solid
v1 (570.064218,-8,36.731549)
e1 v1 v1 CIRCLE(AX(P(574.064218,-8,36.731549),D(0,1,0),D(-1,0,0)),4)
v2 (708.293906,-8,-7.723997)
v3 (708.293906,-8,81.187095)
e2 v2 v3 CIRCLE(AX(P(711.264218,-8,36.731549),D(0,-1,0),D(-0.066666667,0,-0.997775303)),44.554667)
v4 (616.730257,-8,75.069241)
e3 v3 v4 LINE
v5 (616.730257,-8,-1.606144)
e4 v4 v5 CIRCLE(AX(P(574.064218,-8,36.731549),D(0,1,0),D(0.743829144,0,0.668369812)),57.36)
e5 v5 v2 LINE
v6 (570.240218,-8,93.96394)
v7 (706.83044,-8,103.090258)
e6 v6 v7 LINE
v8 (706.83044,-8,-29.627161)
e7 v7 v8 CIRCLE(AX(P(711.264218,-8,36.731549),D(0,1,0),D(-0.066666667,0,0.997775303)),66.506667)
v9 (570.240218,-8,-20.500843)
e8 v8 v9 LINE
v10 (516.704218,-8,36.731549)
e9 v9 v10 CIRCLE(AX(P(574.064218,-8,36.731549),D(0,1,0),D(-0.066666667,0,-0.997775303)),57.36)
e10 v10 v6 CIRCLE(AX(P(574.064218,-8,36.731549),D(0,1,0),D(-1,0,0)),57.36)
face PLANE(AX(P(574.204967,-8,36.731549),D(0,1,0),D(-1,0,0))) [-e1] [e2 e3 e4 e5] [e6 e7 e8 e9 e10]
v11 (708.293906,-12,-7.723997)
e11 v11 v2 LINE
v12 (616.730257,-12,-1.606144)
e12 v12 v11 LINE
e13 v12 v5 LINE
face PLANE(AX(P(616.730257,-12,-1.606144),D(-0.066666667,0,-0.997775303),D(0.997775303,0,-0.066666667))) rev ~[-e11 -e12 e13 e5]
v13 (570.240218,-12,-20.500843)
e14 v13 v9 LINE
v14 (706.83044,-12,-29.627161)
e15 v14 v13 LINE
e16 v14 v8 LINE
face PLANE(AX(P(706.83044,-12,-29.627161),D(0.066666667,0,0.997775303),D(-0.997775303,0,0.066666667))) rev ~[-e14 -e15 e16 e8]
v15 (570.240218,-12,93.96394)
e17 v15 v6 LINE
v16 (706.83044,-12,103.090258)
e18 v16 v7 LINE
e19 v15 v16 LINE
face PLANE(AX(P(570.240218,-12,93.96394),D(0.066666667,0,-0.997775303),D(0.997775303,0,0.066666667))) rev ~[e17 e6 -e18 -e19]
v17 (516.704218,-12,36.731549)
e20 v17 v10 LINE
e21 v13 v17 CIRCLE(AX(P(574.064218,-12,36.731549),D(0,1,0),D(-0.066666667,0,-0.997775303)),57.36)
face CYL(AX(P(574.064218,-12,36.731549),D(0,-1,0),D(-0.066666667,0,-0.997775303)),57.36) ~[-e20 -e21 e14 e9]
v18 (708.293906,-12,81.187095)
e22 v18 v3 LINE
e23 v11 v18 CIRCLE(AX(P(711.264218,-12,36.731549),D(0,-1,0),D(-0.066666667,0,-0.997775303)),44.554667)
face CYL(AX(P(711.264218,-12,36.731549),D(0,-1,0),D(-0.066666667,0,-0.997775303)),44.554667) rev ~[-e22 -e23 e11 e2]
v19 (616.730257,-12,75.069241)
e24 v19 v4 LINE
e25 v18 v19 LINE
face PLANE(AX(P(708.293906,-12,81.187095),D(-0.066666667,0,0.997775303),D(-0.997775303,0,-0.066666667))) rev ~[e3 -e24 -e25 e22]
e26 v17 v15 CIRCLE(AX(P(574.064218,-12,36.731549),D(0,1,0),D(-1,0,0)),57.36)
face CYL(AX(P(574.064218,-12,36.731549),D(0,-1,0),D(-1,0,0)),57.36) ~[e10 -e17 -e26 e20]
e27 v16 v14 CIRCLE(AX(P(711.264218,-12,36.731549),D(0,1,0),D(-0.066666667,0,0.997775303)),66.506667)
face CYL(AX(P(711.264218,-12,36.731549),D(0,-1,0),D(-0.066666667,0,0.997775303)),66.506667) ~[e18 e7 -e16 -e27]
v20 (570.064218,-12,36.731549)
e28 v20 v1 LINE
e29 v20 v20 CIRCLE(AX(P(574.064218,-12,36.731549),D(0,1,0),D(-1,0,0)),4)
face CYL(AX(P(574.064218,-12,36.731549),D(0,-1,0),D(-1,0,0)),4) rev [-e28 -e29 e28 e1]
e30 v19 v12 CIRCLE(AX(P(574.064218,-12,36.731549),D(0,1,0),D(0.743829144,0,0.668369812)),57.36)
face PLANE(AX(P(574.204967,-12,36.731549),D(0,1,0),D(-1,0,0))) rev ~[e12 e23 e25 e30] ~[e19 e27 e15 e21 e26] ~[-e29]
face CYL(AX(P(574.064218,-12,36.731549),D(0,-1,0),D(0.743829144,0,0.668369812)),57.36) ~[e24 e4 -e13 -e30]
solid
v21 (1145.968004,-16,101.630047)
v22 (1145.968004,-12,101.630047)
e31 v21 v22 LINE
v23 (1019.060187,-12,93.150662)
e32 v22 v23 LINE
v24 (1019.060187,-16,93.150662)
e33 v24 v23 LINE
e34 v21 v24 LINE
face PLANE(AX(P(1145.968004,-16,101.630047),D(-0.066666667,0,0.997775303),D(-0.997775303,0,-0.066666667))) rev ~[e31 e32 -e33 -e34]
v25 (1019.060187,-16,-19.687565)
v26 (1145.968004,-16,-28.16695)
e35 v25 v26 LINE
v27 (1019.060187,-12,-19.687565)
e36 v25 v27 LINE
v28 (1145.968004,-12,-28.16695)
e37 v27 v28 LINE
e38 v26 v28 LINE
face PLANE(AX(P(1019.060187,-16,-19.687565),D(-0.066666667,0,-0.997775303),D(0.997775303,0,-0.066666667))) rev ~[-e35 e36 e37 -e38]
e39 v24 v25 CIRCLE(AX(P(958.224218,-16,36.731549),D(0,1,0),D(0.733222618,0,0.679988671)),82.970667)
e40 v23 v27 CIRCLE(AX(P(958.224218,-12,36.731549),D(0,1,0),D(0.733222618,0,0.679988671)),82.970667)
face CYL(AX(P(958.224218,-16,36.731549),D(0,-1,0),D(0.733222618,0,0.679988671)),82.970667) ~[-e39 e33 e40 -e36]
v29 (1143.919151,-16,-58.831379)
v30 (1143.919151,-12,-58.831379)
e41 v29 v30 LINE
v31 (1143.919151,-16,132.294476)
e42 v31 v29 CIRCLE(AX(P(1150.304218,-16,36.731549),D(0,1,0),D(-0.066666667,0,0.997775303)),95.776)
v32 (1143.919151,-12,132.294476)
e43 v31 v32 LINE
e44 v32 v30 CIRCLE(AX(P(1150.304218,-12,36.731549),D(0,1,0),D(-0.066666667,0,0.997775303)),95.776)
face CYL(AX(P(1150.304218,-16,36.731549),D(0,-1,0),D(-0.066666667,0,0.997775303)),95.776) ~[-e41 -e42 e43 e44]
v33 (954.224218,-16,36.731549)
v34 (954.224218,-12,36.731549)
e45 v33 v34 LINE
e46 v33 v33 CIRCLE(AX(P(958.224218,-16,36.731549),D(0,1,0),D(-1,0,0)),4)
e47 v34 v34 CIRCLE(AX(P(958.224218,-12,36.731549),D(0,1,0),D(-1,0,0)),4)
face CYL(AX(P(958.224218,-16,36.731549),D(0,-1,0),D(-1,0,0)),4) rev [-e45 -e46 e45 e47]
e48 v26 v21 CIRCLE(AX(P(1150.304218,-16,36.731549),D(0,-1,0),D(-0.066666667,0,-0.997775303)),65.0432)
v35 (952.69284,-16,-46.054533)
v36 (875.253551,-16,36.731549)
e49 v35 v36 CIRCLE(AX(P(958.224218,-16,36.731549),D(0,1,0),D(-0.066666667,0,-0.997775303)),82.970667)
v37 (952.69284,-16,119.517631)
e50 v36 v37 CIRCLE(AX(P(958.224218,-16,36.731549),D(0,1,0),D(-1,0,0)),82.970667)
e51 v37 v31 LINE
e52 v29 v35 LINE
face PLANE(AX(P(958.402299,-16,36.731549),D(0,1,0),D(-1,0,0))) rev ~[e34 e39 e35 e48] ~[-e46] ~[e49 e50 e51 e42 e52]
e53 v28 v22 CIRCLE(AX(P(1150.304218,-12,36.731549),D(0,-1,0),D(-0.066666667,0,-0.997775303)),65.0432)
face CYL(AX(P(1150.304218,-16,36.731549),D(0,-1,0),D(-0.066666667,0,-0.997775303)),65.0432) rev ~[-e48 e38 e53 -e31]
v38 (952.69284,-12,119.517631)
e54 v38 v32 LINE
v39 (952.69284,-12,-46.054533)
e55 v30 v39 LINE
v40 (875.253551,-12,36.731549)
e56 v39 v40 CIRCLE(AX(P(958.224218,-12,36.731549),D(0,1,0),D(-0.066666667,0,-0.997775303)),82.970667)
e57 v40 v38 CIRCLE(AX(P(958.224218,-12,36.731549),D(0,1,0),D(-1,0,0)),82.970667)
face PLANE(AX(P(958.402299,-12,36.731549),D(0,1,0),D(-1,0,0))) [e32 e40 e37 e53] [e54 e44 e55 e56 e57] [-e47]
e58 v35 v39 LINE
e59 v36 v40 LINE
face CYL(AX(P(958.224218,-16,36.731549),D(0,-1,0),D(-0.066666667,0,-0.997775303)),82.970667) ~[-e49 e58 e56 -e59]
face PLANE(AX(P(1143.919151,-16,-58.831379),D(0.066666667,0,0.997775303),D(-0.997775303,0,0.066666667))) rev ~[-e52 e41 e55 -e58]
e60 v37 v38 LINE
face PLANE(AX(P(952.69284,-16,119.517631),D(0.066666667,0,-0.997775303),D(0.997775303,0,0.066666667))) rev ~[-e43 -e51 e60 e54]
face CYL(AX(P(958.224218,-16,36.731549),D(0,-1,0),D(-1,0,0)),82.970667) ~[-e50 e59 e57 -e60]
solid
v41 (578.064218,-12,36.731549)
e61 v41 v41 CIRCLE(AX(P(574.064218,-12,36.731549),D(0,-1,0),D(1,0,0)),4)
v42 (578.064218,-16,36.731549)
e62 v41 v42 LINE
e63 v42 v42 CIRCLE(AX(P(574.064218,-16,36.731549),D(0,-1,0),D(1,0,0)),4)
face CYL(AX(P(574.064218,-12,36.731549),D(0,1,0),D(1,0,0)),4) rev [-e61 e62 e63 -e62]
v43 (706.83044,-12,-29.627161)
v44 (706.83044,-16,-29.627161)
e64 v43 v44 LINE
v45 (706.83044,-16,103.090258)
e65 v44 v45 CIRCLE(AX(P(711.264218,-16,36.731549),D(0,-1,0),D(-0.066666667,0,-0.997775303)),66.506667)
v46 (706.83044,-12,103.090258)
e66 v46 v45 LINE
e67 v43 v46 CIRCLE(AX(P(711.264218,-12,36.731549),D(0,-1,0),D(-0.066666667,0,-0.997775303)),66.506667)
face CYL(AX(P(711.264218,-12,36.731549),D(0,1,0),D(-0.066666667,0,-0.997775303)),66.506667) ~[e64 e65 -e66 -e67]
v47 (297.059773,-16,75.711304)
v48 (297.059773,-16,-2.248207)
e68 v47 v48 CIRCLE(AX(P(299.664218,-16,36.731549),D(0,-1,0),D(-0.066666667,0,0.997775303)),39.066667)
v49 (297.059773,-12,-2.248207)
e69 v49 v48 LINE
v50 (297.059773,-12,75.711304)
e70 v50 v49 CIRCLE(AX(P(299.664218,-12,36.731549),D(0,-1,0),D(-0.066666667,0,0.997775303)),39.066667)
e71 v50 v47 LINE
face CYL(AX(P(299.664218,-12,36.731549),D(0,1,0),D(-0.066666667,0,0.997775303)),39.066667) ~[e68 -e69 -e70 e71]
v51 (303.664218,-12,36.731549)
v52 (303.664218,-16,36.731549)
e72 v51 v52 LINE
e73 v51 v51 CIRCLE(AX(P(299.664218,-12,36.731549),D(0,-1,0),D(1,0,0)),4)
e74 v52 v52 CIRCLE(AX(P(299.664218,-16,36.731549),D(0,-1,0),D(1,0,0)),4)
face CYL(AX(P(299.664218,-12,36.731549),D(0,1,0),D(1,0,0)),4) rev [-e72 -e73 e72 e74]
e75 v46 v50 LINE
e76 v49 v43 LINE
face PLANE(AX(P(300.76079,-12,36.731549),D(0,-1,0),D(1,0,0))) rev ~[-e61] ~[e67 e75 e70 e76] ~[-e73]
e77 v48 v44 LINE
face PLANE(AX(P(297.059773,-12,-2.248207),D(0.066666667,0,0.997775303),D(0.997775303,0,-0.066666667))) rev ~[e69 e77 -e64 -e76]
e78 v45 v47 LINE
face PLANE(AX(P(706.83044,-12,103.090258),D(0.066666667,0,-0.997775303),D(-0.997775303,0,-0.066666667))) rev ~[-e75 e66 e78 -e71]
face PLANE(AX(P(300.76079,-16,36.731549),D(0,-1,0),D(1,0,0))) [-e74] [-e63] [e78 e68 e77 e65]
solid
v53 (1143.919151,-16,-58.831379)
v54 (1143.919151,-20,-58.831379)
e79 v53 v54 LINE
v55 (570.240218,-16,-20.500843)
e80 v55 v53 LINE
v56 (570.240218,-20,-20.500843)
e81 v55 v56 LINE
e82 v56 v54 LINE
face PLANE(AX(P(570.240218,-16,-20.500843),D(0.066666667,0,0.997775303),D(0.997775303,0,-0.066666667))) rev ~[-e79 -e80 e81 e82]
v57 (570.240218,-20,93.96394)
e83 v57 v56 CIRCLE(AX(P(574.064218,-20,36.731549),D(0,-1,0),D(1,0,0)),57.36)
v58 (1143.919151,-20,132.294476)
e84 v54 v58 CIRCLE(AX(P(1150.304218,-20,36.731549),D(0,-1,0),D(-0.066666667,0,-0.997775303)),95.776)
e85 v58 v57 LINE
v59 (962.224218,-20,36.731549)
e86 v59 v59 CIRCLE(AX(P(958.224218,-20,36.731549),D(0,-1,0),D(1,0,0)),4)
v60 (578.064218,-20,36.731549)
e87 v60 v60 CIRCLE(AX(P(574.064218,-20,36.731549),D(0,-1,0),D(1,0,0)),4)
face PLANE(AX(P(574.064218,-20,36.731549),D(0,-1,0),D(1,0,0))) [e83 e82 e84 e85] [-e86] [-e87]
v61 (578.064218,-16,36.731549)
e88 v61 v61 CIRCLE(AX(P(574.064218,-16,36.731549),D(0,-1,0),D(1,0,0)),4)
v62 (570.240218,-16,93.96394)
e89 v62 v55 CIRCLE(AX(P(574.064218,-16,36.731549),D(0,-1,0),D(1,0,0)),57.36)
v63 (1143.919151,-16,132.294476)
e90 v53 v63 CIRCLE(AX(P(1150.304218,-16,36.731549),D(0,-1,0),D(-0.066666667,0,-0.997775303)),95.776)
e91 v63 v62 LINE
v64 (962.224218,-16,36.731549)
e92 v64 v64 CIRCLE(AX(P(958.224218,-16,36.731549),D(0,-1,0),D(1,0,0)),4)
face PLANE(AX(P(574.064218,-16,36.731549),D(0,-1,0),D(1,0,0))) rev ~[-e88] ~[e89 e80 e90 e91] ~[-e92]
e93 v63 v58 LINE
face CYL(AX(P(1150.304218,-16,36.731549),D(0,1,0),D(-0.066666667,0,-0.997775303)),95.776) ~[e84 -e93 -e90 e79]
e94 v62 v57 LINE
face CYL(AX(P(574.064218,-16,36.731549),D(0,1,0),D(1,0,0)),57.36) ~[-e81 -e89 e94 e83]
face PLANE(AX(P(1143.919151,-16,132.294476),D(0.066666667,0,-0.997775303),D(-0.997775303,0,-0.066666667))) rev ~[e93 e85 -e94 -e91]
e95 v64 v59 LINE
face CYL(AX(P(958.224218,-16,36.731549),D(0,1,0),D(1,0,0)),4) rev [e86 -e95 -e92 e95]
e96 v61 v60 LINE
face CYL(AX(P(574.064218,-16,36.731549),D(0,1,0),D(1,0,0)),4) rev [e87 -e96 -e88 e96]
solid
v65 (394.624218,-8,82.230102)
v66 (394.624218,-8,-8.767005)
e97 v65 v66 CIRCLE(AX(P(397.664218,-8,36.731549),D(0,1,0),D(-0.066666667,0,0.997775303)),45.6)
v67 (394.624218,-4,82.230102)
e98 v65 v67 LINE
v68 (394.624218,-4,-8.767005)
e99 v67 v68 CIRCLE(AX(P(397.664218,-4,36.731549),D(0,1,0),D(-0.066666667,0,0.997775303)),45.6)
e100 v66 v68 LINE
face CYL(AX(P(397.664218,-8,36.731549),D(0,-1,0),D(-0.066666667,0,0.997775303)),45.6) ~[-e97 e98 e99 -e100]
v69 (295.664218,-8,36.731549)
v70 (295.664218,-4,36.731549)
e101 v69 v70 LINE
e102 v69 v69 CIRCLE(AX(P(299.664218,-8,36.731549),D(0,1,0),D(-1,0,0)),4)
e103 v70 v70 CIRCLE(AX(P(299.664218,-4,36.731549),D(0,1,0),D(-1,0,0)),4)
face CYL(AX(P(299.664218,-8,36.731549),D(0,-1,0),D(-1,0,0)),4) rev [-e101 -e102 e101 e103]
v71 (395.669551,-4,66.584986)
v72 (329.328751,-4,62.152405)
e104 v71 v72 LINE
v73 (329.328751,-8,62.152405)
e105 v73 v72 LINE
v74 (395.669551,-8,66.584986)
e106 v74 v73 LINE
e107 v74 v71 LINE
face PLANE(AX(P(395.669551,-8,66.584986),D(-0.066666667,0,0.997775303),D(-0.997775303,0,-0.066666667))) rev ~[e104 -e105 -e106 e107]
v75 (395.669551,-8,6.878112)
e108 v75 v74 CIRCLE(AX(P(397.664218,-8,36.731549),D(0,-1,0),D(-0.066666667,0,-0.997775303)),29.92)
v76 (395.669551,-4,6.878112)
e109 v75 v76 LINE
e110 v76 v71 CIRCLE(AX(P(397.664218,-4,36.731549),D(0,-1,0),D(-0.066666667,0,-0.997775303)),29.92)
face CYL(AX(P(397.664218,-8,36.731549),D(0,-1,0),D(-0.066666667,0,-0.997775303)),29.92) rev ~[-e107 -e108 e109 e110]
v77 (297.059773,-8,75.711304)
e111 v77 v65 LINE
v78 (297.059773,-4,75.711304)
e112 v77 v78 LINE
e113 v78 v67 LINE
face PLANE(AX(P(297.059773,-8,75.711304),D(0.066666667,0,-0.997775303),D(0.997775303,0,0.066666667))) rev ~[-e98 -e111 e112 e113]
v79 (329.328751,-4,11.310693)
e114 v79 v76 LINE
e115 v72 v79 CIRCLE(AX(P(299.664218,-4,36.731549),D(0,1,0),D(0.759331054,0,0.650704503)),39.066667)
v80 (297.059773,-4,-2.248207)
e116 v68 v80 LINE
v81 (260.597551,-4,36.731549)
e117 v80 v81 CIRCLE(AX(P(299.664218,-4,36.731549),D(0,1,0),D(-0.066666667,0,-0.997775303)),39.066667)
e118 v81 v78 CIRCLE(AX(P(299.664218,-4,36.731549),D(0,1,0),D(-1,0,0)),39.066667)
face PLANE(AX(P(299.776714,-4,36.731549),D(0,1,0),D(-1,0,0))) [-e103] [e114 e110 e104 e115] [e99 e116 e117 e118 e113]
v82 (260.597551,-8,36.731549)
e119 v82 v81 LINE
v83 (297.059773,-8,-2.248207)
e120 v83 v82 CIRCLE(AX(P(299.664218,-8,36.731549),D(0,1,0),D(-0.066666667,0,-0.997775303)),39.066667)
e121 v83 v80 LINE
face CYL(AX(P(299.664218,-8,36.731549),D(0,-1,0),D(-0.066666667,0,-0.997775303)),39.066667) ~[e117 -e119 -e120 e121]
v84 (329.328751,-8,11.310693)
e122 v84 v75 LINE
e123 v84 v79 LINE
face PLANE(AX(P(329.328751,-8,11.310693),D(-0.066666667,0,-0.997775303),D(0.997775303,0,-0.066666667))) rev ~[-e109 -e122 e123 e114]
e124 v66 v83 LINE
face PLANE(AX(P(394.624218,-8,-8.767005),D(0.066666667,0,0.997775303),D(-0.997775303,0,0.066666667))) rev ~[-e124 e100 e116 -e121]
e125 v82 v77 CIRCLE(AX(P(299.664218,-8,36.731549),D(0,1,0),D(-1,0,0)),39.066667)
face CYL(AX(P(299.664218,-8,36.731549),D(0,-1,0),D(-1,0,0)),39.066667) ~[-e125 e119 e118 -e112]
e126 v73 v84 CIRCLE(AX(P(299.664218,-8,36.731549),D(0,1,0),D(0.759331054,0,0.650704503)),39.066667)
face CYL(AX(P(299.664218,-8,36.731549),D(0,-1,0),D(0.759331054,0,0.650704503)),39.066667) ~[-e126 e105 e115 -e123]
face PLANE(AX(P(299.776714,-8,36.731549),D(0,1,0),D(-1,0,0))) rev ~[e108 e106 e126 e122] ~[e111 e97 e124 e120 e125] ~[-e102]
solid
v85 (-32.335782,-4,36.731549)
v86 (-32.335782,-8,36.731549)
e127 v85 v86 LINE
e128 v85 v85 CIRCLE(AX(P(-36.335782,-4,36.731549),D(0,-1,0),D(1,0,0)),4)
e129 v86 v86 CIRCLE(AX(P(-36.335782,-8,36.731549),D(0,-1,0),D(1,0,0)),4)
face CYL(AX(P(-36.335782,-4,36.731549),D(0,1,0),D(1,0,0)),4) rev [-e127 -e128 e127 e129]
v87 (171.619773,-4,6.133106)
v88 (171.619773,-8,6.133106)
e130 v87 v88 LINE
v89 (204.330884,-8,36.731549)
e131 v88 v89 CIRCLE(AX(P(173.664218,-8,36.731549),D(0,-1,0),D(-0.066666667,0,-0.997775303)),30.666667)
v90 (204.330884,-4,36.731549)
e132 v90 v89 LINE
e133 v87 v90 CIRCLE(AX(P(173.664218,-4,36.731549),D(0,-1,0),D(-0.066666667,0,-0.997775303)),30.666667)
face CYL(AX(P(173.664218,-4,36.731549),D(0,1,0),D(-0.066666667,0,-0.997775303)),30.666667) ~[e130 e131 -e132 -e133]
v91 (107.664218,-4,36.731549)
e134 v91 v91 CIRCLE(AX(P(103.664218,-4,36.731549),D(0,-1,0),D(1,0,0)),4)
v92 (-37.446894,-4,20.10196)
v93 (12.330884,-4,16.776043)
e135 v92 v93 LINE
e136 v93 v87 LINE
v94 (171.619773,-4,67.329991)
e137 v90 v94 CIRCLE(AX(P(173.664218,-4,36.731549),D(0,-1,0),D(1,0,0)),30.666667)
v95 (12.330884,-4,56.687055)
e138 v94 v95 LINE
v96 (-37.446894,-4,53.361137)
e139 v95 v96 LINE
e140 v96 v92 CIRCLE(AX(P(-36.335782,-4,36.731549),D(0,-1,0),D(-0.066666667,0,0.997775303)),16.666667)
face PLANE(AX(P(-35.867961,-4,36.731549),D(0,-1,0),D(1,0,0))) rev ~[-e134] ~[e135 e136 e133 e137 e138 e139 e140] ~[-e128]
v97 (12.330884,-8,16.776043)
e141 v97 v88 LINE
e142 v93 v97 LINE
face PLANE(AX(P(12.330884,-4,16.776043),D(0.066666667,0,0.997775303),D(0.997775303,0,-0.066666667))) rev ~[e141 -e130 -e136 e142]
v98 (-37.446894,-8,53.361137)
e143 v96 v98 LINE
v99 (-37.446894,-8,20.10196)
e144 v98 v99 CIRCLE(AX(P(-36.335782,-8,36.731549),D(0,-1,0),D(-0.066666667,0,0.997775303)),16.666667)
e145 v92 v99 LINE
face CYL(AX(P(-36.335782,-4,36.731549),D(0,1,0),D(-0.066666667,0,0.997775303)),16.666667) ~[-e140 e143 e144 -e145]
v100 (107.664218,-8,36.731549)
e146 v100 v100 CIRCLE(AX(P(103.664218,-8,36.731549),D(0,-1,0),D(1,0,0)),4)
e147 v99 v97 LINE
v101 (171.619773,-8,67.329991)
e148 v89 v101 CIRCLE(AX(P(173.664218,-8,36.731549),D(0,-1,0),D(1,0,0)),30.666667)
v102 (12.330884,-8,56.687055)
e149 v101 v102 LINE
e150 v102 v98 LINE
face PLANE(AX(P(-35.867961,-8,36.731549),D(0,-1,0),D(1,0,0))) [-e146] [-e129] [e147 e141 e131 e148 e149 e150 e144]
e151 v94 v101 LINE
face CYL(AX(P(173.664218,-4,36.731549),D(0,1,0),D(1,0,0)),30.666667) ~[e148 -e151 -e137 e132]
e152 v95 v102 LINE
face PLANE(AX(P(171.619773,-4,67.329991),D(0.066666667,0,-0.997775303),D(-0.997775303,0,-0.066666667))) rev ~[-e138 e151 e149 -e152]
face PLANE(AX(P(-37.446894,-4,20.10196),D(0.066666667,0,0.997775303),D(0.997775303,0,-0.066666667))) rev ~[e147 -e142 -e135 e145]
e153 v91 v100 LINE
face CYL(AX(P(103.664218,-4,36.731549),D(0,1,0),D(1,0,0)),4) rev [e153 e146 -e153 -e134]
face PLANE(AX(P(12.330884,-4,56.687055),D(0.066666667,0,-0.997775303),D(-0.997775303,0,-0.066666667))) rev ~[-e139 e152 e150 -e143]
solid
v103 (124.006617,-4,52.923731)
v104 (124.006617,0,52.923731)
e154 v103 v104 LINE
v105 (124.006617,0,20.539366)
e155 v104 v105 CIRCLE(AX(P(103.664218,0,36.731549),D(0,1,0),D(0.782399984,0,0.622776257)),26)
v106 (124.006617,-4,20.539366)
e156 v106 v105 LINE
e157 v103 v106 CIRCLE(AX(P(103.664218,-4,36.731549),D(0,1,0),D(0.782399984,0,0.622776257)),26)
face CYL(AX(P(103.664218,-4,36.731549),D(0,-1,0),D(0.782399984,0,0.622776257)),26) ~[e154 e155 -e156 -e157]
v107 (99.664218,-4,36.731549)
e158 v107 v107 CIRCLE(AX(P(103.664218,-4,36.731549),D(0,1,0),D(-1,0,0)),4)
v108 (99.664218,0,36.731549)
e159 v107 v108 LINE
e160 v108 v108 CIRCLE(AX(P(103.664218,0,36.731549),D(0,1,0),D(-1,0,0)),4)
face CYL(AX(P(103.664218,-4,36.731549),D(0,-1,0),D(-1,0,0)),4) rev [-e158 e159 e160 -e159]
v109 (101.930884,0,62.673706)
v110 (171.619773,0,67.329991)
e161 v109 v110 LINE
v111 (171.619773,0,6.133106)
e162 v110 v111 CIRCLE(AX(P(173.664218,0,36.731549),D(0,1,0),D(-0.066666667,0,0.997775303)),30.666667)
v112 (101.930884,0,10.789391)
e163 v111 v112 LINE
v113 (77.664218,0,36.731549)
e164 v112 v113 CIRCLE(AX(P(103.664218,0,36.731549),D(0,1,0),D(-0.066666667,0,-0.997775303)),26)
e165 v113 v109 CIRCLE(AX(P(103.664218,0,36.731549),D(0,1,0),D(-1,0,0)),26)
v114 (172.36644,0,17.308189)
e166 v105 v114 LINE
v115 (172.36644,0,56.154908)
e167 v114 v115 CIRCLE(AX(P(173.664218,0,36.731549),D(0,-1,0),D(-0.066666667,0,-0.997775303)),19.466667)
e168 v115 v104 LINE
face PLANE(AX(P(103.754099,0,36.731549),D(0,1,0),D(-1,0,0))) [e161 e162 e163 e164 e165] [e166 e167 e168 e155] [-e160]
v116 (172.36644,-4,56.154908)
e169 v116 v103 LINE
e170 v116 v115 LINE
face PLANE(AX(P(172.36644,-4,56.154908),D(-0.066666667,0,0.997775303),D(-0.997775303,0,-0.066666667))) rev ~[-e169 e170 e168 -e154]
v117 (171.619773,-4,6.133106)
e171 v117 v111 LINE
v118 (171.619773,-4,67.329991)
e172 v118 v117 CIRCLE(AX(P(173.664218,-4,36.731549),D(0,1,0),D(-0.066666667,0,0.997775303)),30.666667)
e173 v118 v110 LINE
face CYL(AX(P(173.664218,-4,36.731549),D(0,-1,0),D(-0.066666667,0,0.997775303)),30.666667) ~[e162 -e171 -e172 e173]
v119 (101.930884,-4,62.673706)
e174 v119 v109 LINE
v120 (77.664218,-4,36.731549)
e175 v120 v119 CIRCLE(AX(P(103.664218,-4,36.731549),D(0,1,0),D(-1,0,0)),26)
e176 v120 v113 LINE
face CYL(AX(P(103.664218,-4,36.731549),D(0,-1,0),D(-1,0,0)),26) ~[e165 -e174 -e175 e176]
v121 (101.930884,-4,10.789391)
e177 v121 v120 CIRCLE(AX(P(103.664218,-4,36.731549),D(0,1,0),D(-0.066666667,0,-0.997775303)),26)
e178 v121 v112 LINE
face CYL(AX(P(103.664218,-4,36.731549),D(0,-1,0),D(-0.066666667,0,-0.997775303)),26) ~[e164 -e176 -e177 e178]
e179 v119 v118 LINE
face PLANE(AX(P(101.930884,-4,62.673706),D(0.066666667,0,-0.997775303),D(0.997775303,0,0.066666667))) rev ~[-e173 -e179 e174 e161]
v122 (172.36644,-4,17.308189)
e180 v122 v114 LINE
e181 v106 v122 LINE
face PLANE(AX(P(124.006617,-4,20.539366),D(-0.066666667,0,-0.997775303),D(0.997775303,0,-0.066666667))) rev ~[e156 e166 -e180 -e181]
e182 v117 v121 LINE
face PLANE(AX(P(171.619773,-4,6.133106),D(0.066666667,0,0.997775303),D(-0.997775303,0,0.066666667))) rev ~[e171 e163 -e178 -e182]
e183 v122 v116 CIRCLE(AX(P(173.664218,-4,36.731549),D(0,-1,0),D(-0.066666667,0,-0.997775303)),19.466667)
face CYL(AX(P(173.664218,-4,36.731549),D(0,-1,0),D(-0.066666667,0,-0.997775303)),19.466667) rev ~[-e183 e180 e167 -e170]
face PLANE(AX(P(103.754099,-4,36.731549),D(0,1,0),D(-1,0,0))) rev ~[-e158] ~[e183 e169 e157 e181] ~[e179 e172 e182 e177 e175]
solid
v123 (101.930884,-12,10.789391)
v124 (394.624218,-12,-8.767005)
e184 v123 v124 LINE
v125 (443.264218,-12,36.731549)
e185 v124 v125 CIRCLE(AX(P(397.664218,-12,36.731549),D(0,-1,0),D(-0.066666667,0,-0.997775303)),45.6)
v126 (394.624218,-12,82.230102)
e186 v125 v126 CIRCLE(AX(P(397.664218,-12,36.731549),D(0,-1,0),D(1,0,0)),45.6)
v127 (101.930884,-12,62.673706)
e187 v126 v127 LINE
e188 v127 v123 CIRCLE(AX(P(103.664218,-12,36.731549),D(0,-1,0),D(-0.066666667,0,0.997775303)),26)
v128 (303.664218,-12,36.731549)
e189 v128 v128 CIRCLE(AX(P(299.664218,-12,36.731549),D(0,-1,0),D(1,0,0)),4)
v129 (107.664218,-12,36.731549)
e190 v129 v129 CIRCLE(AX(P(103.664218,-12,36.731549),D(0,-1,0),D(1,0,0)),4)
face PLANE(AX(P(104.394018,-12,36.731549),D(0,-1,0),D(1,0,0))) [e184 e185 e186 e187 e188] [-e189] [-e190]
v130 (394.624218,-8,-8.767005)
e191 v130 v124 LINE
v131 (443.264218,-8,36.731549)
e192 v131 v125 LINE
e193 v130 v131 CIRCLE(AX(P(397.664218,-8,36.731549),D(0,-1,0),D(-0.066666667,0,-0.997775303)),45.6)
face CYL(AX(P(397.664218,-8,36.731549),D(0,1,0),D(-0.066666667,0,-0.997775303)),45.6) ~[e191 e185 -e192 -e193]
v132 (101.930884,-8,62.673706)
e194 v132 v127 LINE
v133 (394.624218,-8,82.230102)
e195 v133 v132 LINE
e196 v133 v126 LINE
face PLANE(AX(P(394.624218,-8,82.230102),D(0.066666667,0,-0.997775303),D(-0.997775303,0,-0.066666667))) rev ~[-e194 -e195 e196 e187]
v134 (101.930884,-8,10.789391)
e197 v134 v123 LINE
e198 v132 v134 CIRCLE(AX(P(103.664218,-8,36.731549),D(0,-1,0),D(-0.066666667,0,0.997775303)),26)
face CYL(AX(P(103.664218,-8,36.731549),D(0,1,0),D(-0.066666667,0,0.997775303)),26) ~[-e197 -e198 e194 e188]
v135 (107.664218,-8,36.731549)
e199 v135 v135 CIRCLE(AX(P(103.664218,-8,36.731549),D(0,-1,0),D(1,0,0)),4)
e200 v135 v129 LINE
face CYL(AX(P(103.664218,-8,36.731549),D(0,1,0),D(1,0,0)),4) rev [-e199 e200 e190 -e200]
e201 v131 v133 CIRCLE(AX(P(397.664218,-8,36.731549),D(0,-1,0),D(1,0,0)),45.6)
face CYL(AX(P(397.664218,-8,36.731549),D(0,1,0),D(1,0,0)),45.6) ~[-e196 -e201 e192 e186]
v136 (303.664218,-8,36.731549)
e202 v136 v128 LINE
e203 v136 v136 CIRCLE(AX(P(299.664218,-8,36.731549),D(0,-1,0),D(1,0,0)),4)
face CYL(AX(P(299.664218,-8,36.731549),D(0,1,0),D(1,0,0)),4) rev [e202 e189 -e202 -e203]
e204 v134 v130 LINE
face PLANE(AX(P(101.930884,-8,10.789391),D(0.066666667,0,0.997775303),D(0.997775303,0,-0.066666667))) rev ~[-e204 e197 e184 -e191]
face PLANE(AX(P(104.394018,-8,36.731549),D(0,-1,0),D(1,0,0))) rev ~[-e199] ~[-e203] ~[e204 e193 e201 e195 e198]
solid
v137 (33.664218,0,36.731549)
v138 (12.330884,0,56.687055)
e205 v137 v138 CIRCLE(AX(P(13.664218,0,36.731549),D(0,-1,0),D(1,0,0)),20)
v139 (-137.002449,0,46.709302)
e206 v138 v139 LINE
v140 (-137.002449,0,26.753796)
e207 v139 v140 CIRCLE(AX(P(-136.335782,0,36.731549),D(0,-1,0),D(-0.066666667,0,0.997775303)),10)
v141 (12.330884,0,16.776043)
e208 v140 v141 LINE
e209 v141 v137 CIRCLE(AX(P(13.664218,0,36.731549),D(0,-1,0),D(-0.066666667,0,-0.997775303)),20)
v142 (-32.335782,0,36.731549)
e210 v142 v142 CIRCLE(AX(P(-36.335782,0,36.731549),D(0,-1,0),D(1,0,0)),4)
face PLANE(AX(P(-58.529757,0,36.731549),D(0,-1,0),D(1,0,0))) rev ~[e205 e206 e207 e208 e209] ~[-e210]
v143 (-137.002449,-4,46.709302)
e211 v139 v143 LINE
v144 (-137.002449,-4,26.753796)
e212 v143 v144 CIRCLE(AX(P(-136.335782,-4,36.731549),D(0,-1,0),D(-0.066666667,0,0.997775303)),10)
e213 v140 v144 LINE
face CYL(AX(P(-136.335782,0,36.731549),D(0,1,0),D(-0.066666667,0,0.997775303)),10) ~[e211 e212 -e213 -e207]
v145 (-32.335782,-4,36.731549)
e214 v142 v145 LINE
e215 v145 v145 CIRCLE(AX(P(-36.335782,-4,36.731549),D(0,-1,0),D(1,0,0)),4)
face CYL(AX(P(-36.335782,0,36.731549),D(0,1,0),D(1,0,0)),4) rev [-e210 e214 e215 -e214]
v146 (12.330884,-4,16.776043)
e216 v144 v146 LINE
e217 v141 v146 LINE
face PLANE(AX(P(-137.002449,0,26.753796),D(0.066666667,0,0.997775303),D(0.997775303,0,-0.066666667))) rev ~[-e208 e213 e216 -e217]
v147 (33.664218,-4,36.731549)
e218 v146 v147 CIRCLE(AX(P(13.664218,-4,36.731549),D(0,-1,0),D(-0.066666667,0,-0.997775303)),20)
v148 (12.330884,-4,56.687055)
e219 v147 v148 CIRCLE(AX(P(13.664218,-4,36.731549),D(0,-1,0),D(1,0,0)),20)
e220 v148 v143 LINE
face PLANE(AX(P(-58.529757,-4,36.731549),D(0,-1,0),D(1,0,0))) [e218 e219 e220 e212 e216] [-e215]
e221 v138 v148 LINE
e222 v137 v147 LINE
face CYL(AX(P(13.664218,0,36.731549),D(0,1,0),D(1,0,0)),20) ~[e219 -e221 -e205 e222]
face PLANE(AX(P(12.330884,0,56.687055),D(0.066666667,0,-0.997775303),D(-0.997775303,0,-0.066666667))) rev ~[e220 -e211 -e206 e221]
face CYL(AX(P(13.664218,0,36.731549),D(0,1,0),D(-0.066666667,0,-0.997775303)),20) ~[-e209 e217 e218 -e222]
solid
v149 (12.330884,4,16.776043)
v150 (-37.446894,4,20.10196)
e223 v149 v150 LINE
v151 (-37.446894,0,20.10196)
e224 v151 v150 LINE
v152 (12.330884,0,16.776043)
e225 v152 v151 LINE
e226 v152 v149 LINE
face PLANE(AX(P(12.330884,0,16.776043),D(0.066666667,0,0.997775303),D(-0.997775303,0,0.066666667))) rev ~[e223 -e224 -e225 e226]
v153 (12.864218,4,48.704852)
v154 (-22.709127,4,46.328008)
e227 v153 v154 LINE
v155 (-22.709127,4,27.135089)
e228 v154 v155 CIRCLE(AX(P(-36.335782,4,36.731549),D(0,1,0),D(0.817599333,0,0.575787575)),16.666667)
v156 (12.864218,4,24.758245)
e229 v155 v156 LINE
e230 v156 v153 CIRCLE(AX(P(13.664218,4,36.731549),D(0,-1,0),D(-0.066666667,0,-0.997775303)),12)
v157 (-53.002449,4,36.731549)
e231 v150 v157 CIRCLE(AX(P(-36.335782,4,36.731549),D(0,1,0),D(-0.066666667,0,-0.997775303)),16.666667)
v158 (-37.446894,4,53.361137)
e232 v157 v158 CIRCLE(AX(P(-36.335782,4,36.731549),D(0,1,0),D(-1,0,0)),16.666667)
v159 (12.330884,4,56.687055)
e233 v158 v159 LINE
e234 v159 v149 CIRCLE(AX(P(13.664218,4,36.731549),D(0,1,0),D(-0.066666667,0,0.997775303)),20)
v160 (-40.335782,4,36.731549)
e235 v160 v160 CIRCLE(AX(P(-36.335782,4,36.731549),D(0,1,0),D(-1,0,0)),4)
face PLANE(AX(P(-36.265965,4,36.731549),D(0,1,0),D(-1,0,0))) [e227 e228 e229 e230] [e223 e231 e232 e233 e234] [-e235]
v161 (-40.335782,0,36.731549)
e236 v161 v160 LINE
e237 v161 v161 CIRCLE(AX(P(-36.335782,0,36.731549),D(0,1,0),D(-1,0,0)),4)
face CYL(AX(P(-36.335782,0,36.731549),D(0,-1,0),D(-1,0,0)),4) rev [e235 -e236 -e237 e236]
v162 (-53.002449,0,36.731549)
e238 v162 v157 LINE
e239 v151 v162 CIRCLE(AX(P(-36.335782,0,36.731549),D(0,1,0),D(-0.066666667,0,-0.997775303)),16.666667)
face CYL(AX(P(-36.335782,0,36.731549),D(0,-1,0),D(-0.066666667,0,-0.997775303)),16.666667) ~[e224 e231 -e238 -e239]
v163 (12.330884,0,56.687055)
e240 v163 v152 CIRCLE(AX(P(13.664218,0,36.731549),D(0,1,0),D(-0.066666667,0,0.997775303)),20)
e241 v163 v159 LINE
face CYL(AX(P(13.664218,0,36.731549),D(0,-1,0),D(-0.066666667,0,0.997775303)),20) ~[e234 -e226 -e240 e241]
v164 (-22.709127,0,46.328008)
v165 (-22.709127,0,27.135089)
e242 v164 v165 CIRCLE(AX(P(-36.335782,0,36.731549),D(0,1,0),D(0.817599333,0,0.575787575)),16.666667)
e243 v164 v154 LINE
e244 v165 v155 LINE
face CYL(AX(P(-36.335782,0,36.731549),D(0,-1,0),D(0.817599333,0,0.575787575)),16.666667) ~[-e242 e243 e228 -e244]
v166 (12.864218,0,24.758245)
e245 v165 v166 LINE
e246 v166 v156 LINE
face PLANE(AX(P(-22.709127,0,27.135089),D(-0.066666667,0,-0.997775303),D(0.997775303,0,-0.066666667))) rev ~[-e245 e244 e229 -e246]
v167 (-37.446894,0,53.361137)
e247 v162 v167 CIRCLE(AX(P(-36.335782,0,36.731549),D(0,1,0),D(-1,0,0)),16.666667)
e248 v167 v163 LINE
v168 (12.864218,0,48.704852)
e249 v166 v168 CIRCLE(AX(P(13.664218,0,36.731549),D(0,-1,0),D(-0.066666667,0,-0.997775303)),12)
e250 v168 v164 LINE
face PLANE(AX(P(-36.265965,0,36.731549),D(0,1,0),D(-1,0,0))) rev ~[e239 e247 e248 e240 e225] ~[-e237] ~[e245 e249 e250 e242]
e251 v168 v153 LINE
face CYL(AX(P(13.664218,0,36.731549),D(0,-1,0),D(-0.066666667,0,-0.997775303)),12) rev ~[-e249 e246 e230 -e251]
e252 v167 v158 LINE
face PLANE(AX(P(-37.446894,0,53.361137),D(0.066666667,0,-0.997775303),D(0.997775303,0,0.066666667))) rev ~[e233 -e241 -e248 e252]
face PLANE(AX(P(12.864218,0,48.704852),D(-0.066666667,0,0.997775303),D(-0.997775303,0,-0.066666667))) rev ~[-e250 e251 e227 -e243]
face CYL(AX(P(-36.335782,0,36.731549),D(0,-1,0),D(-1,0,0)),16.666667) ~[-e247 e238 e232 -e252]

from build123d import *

# Parameters (mm, degrees)
F0_R      = 4
F1_DEPTH  = 4
F2_R      = 4
F3_DEPTH  = 4
F4_R      = 4
F5_DEPTH  = 4
F6_R      = 4
F7_DEPTH  = 4
F8_R      = 4
F9_DEPTH  = 4
F10_R     = 4
F11_DEPTH = 4
F12_R     = 4
F13_DEPTH = 4
F14_R     = 4
F15_DEPTH = 4
F16_R     = 4
F17_DEPTH = 4
F18_R     = 4
F19_DEPTH = 4


with BuildPart() as f1:
    # F0 (on Front) → F1 (new body)
    with BuildSketch(Plane.XZ):
        with BuildLine():
            ThreePointArc((12.3308842136, 16.7760425446), (-6.335782453, 36.7315486073), (12.3308842136, 56.6870546701))
            Line((12.3308842136, 56.6870546701), (-137.0024491197, 46.7093016387))
            ThreePointArc((-137.0024491197, 46.7093016387), (-129.5044819424, 44.0345160408), (-126.335782453, 36.7315486073))
            ThreePointArc((-126.335782453, 36.7315486073), (-129.5044819424, 29.4285811739), (-137.0024491197, 26.753795576))
            Line((-137.0024491197, 26.753795576), (12.3308842136, 16.7760425446))
        make_face()
        with Locations((-36.335782453, 36.7315486073)):
            Circle(F0_R, mode=Mode.SUBTRACT)
        with BuildLine():
            ThreePointArc((-126.335782453, 36.7315486073), (-129.5044819424, 44.0345160408), (-137.0024491197, 46.7093016387))
            ThreePointArc((-137.0024491197, 46.7093016387), (-146.335782453, 36.7315486073), (-137.0024491197, 26.753795576))
            ThreePointArc((-137.0024491197, 26.753795576), (-129.5044819424, 29.4285811739), (-126.335782453, 36.7315486073))
        make_face()
        with BuildLine():
            ThreePointArc((12.3308842136, 16.7760425446), (27.3268185682, 22.1256137405), (33.664217547, 36.7315486073))
            ThreePointArc((33.664217547, 36.7315486073), (27.3268185682, 51.3374834742), (12.3308842136, 56.6870546701))
            ThreePointArc((12.3308842136, 56.6870546701), (-6.335782453, 36.7315486073), (12.3308842136, 16.7760425446))
        make_face()
    extrude(amount=F1_DEPTH)


with BuildPart() as f3:
    # F2 (on face) → F3 (new body)
    with BuildSketch(Plane(origin=(0, 0, 0), x_dir=(-1, 0, 0), z_dir=(0, 1, 0))):
        with BuildLine():
            ThreePointArc((22.7091269114, 27.1350890244), (29.1576254272, 21.6898785042), (37.4468935642, 20.1019602217))
            ThreePointArc((37.4468935642, 20.1019602217), (48.507394842, 25.3460477563), (53.0024491197, 36.7315486073))
            ThreePointArc((53.0024491197, 36.7315486073), (48.507394842, 48.1170494584), (37.4468935642, 53.361136993))
            ThreePointArc((37.4468935642, 53.361136993), (29.1576254272, 51.7732187105), (22.7091269114, 46.3280081903))
            ThreePointArc((22.7091269114, 46.3280081903), (19.6691157864, 36.7315486073), (22.7091269114, 27.1350890244))
        make_face()
        with Locations((36.335782453, 36.7315486073)):
            Circle(F2_R, mode=Mode.SUBTRACT)
        with BuildLine():
            Line((-12.3308842136, 16.7760425446), (37.4468935642, 20.1019602217))
            ThreePointArc((37.4468935642, 20.1019602217), (29.1576254272, 21.6898785042), (22.7091269114, 27.1350890244))
            Line((22.7091269114, 27.1350890244), (-12.864217547, 24.7582449697))
            ThreePointArc((-12.864217547, 24.7582449697), (-25.664217547, 36.7315486073), (-12.864217547, 48.704852245))
            Line((-12.864217547, 48.704852245), (22.7091269114, 46.3280081903))
            ThreePointArc((22.7091269114, 46.3280081903), (29.1576254272, 51.7732187105), (37.4468935642, 53.361136993))
            Line((37.4468935642, 53.361136993), (-12.3308842136, 56.6870546701))
            ThreePointArc((-12.3308842136, 56.6870546701), (-33.664217547, 36.7315486073), (-12.3308842136, 16.7760425446))
        make_face()
    extrude(amount=F3_DEPTH)


with BuildPart() as f5:
    # F4 (on face) → F5 (new body)
    with BuildSketch(Plane.XZ.offset(4)):
        with BuildLine():
            ThreePointArc((-37.4468935642, 20.1019602217), (-24.950281602, 24.5599362183), (-19.6691157864, 36.7315486073))
            ThreePointArc((-19.6691157864, 36.7315486073), (-24.950281602, 48.9031609964), (-37.4468935642, 53.361136993))
            ThreePointArc((-37.4468935642, 53.361136993), (-53.0024491197, 36.7315486073), (-37.4468935642, 20.1019602217))
        make_face()
        with Locations((-36.335782453, 36.7315486073)):
            Circle(F4_R, mode=Mode.SUBTRACT)
        with BuildLine():
            Line((171.6197731025, 67.329991237), (12.3308842136, 56.6870546701))
            ThreePointArc((12.3308842136, 56.6870546701), (33.664217547, 36.7315486073), (12.3308842136, 16.7760425446))
            Line((12.3308842136, 16.7760425446), (171.6197731025, 6.1331059777))
            ThreePointArc((171.6197731025, 6.1331059777), (142.9975508803, 36.7315486073), (171.6197731025, 67.329991237))
        make_face()
        with Locations((103.664217547, 36.7315486073)):
            Circle(F4_R, mode=Mode.SUBTRACT)
        with BuildLine():
            ThreePointArc((-37.4468935642, 53.361136993), (-24.950281602, 48.9031609964), (-19.6691157864, 36.7315486073))
            ThreePointArc((-19.6691157864, 36.7315486073), (-24.950281602, 24.5599362183), (-37.4468935642, 20.1019602217))
            Line((-37.4468935642, 20.1019602217), (12.3308842136, 16.7760425446))
            ThreePointArc((12.3308842136, 16.7760425446), (33.664217547, 36.7315486073), (12.3308842136, 56.6870546701))
            Line((12.3308842136, 56.6870546701), (-37.4468935642, 53.361136993))
        make_face()
        with BuildLine():
            ThreePointArc((204.3308842136, 36.7315486073), (194.6135391129, 59.1273154031), (171.6197731025, 67.329991237))
            ThreePointArc((171.6197731025, 67.329991237), (142.9975508803, 36.7315486073), (171.6197731025, 6.1331059777))
            ThreePointArc((171.6197731025, 6.1331059777), (194.6135391129, 14.3357818116), (204.3308842136, 36.7315486073))
        make_face()
    extrude(amount=F5_DEPTH)


with BuildPart() as f7:
    # F6 (on face) → F7 (new body)
    with BuildSketch(Plane(origin=(0, -4, 0), x_dir=(-1, 0, 0), z_dir=(0, 1, 0))):
        with BuildLine():
            ThreePointArc((-101.9308842136, 10.7893907257), (-84.6765022201, 18.9701672797), (-77.664217547, 36.7315486073))
            ThreePointArc((-77.664217547, 36.7315486073), (-84.6765022201, 54.492929935), (-101.9308842136, 62.673706489))
            ThreePointArc((-101.9308842136, 62.673706489), (-114.1684948062, 60.5151597558), (-124.0066171202, 52.9237312768))
            ThreePointArc((-124.0066171202, 52.9237312768), (-129.664217547, 36.7315486073), (-124.0066171202, 20.5393659379))
            ThreePointArc((-124.0066171202, 20.5393659379), (-114.1684948062, 12.9479374589), (-101.9308842136, 10.7893907257))
        make_face()
        with Locations((-103.664217547, 36.7315486073)):
            Circle(F6_R, mode=Mode.SUBTRACT)
        with BuildLine():
            ThreePointArc((-124.0066171202, 52.9237312768), (-114.1684948062, 60.5151597558), (-101.9308842136, 62.673706489))
            Line((-101.9308842136, 62.673706489), (-171.6197731025, 67.329991237))
            ThreePointArc((-171.6197731025, 67.329991237), (-204.3308842136, 36.7315486073), (-171.6197731025, 6.1331059777))
            Line((-171.6197731025, 6.1331059777), (-101.9308842136, 10.7893907257))
            ThreePointArc((-101.9308842136, 10.7893907257), (-114.1684948062, 12.9479374589), (-124.0066171202, 20.5393659379))
            Line((-124.0066171202, 20.5393659379), (-172.3664397692, 17.3081893729))
            ThreePointArc((-172.3664397692, 17.3081893729), (-193.1308842136, 36.7315486073), (-172.3664397692, 56.1549078418))
            Line((-172.3664397692, 56.1549078418), (-124.0066171202, 52.9237312768))
        make_face()
    extrude(amount=F7_DEPTH)


with BuildPart() as f9:
    # F8 (on face) → F9 (new body)
    with BuildSketch(Plane.XZ.offset(8)):
        with BuildLine():
            ThreePointArc((101.9308842136, 10.7893907257), (121.4255988746, 17.7438332805), (129.664217547, 36.7315486073))
            ThreePointArc((129.664217547, 36.7315486073), (121.4255988746, 55.7192639342), (101.9308842136, 62.673706489))
            ThreePointArc((101.9308842136, 62.673706489), (77.664217547, 36.7315486073), (101.9308842136, 10.7893907257))
        make_face()
        with Locations((103.664217547, 36.7315486073)):
            Circle(F8_R, mode=Mode.SUBTRACT)
        with BuildLine():
            ThreePointArc((101.9308842136, 62.673706489), (121.4255988746, 55.7192639342), (129.664217547, 36.7315486073))
            ThreePointArc((129.664217547, 36.7315486073), (121.4255988746, 17.7438332805), (101.9308842136, 10.7893907257))
            Line((101.9308842136, 10.7893907257), (171.6197731025, 6.1331059777))
            ThreePointArc((171.6197731025, 6.1331059777), (204.3308842136, 36.7315486073), (171.6197731025, 67.329991237))
            Line((171.6197731025, 67.329991237), (101.9308842136, 62.673706489))
        make_face()
        with BuildLine():
            Line((394.624217547, 82.2301024305), (171.6197731025, 67.329991237))
            ThreePointArc((171.6197731025, 67.329991237), (204.3308842136, 36.7315486073), (171.6197731025, 6.1331059777))
            Line((171.6197731025, 6.1331059777), (394.624217547, -8.7670052158))
            ThreePointArc((394.624217547, -8.7670052158), (352.064217547, 36.7315486073), (394.624217547, 82.2301024305))
        make_face()
        with Locations((299.664217547, 36.7315486073)):
            Circle(F8_R, mode=Mode.SUBTRACT)
        with BuildLine():
            ThreePointArc((443.264217547, 36.7315486073), (428.8149478755, 70.0330801037), (394.624217547, 82.2301024305))
            ThreePointArc((394.624217547, 82.2301024305), (352.064217547, 36.7315486073), (394.624217547, -8.7670052158))
            ThreePointArc((394.624217547, -8.7670052158), (428.8149478755, 3.430017111), (443.264217547, 36.7315486073))
        make_face()
    extrude(amount=F9_DEPTH)


with BuildPart() as f11:
    # F10 (on face) → F11 (new body)
    with BuildSketch(Plane(origin=(0, -8, 0), x_dir=(-1, 0, 0), z_dir=(0, 1, 0))):
        with BuildLine():
            ThreePointArc((-297.0597731025, -2.2482065686), (-271.1339581071, 10.0439346125), (-260.5975508803, 36.7315486073))
            ThreePointArc((-260.5975508803, 36.7315486073), (-271.1339581071, 63.4191626022), (-297.0597731025, 75.7113037833))
            ThreePointArc((-297.0597731025, 75.7113037833), (-314.7977246755, 72.7479532924), (-329.328750734, 62.1524045182))
            ThreePointArc((-329.328750734, 62.1524045182), (-338.7308842136, 36.7315486073), (-329.328750734, 11.3106926965))
            ThreePointArc((-329.328750734, 11.3106926965), (-314.7977246755, 0.7151439223), (-297.0597731025, -2.2482065686))
        make_face()
        with Locations((-299.664217547, 36.7315486073)):
            Circle(F10_R, mode=Mode.SUBTRACT)
        with BuildLine():
            ThreePointArc((-329.328750734, 62.1524045182), (-314.7977246755, 72.7479532924), (-297.0597731025, 75.7113037833))
            Line((-297.0597731025, 75.7113037833), (-394.624217547, 82.2301024305))
            ThreePointArc((-394.624217547, 82.2301024305), (-443.264217547, 36.7315486073), (-394.624217547, -8.7670052158))
            Line((-394.624217547, -8.7670052158), (-297.0597731025, -2.2482065686))
            ThreePointArc((-297.0597731025, -2.2482065686), (-314.7977246755, 0.7151439223), (-329.328750734, 11.3106926965))
            Line((-329.328750734, 11.3106926965), (-395.6695508803, 6.8781115374))
            ThreePointArc((-395.6695508803, 6.8781115374), (-427.584217547, 36.7315486073), (-395.6695508803, 66.5849856773))
            Line((-395.6695508803, 66.5849856773), (-329.328750734, 62.1524045182))
        make_face()
    extrude(amount=F11_DEPTH)


with BuildPart() as f13:
    # F12 (on face) → F13 (new body)
    with BuildSketch(Plane.XZ.offset(12)):
        with BuildLine():
            ThreePointArc((297.0597731025, -2.2482065686), (326.3518315419, 8.2012891675), (338.7308842136, 36.7315486073))
            ThreePointArc((338.7308842136, 36.7315486073), (326.3518315419, 65.2618080472), (297.0597731025, 75.7113037833))
            ThreePointArc((297.0597731025, 75.7113037833), (260.5975508803, 36.7315486073), (297.0597731025, -2.2482065686))
        make_face()
        with Locations((299.664217547, 36.7315486073)):
            Circle(F12_R, mode=Mode.SUBTRACT)
        with BuildLine():
            ThreePointArc((297.0597731025, 75.7113037833), (326.3518315419, 65.2618080472), (338.7308842136, 36.7315486073))
            ThreePointArc((338.7308842136, 36.7315486073), (326.3518315419, 8.2012891675), (297.0597731025, -2.2482065686))
            Line((297.0597731025, -2.2482065686), (394.624217547, -8.7670052158))
            ThreePointArc((394.624217547, -8.7670052158), (443.264217547, 36.7315486073), (394.624217547, 82.2301024305))
            Line((394.624217547, 82.2301024305), (297.0597731025, 75.7113037833))
        make_face()
        with BuildLine():
            Line((706.8304397692, 103.0902581015), (394.624217547, 82.2301024305))
            ThreePointArc((394.624217547, 82.2301024305), (443.264217547, 36.7315486073), (394.624217547, -8.7670052158))
            Line((394.624217547, -8.7670052158), (706.8304397692, -29.6271608868))
            ThreePointArc((706.8304397692, -29.6271608868), (644.7575508803, 36.7315486073), (706.8304397692, 103.0902581015))
        make_face()
        with Locations((574.064217547, 36.7315486073)):
            Circle(F12_R, mode=Mode.SUBTRACT)
        with BuildLine():
            ThreePointArc((777.7708842136, 36.7315486073), (756.6969201431, 85.3011506844), (706.8304397692, 103.0902581015))
            ThreePointArc((706.8304397692, 103.0902581015), (644.7575508803, 36.7315486073), (706.8304397692, -29.6271608868))
            ThreePointArc((706.8304397692, -29.6271608868), (756.6969201431, -11.8380534697), (777.7708842136, 36.7315486073))
        make_face()
    extrude(amount=F13_DEPTH)


with BuildPart() as f15:
    # F14 (on face) → F15 (new body)
    with BuildSketch(Plane(origin=(0, -12, 0), x_dir=(-1, 0, 0), z_dir=(0, 1, 0))):
        with BuildLine():
            ThreePointArc((-570.240217547, -20.5008427807), (-532.174396349, -2.4527911217), (-516.704217547, 36.7315486073))
            ThreePointArc((-516.704217547, 36.7315486073), (-532.174396349, 75.9158883364), (-570.240217547, 93.9639399954))
            ThreePointArc((-570.240217547, 93.9639399954), (-595.6611715973, 89.8704343291), (-616.7302572302, 75.0692409968))
            ThreePointArc((-616.7302572302, 75.0692409968), (-631.424217547, 36.7315486073), (-616.7302572302, -1.6061437821))
            ThreePointArc((-616.7302572302, -1.6061437821), (-595.6611715973, -16.4073371144), (-570.240217547, -20.5008427807))
        make_face()
        with Locations((-574.064217547, 36.7315486073)):
            Circle(F14_R, mode=Mode.SUBTRACT)
        with BuildLine():
            ThreePointArc((-616.7302572302, 75.0692409968), (-595.6611715973, 89.8704343291), (-570.240217547, 93.9639399954))
            Line((-570.240217547, 93.9639399954), (-706.8304397692, 103.0902581015))
            ThreePointArc((-706.8304397692, 103.0902581015), (-777.7708842136, 36.7315486073), (-706.8304397692, -29.6271608868))
            Line((-706.8304397692, -29.6271608868), (-570.240217547, -20.5008427807))
            ThreePointArc((-570.240217547, -20.5008427807), (-595.6611715973, -16.4073371144), (-616.7302572302, -1.6061437821))
            Line((-616.7302572302, -1.6061437821), (-708.2939064358, -7.7239974323))
            ThreePointArc((-708.2939064358, -7.7239974323), (-755.8188842136, 36.7315486073), (-708.2939064358, 81.187094647))
            Line((-708.2939064358, 81.187094647), (-616.7302572302, 75.0692409968))
        make_face()
    extrude(amount=F15_DEPTH)


with BuildPart() as f17:
    # F16 (on face) → F17 (new body)
    with BuildSketch(Plane.XZ.offset(16)):
        with BuildLine():
            ThreePointArc((570.240217547, -20.5008427807), (613.248557276, -5.1582725906), (631.424217547, 36.7315486073))
            ThreePointArc((631.424217547, 36.7315486073), (613.248557276, 78.6213698053), (570.240217547, 93.9639399954))
            ThreePointArc((570.240217547, 93.9639399954), (516.704217547, 36.7315486073), (570.240217547, -20.5008427807))
        make_face()
        with Locations((574.064217547, 36.7315486073)):
            Circle(F16_R, mode=Mode.SUBTRACT)
        with BuildLine():
            ThreePointArc((570.240217547, 93.9639399954), (613.248557276, 78.6213698053), (631.424217547, 36.7315486073))
            ThreePointArc((631.424217547, 36.7315486073), (613.248557276, -5.1582725906), (570.240217547, -20.5008427807))
            Line((570.240217547, -20.5008427807), (706.8304397692, -29.6271608868))
            ThreePointArc((706.8304397692, -29.6271608868), (777.7708842136, 36.7315486073), (706.8304397692, 103.0902581015))
            Line((706.8304397692, 103.0902581015), (570.240217547, 93.9639399954))
        make_face()
        with BuildLine():
            Line((1143.9191508803, 132.2944760409), (706.8304397692, 103.0902581015))
            ThreePointArc((706.8304397692, 103.0902581015), (777.7708842136, 36.7315486073), (706.8304397692, -29.6271608868))
            Line((706.8304397692, -29.6271608868), (1143.9191508803, -58.8313788262))
            ThreePointArc((1143.9191508803, -58.8313788262), (1054.528217547, 36.7315486073), (1143.9191508803, 132.2944760409))
        make_face()
        with Locations((958.224217547, 36.7315486073)):
            Circle(F16_R, mode=Mode.SUBTRACT)
        with BuildLine():
            ThreePointArc((1246.080217547, 36.7315486073), (1215.7316813177, 106.6764494975), (1143.9191508803, 132.2944760409))
            ThreePointArc((1143.9191508803, 132.2944760409), (1054.528217547, 36.7315486073), (1143.9191508803, -58.8313788262))
            ThreePointArc((1143.9191508803, -58.8313788262), (1215.7316813177, -33.2133522828), (1246.080217547, 36.7315486073))
        make_face()
    extrude(amount=F17_DEPTH)


with BuildPart() as f19:
    # F18 (on face) → F19 (new body)
    with BuildSketch(Plane(origin=(0, -16, 0), x_dir=(-1, 0, 0), z_dir=(0, 1, 0))):
        with BuildLine():
            ThreePointArc((-952.6928397692, -46.0545334777), (-897.6310098875, -19.9482071495), (-875.2535508803, 36.7315486073))
            ThreePointArc((-875.2535508803, 36.7315486073), (-897.6310098875, 93.4113043642), (-952.6928397692, 119.5176306924))
            ThreePointArc((-952.6928397692, 119.5176306924), (-988.8584096054, 113.8397699851), (-1019.0601869407, 93.1506619913))
            ThreePointArc((-1019.0601869407, 93.1506619913), (-1041.1948842136, 36.7315486073), (-1019.0601869407, -19.6875647766))
            ThreePointArc((-1019.0601869407, -19.6875647766), (-988.8584096054, -40.3766727704), (-952.6928397692, -46.0545334777))
        make_face()
        with Locations((-958.224217547, 36.7315486073)):
            Circle(F18_R, mode=Mode.SUBTRACT)
        with BuildLine():
            ThreePointArc((-1019.0601869407, 93.1506619913), (-988.8584096054, 113.8397699851), (-952.6928397692, 119.5176306924))
            Line((-952.6928397692, 119.5176306924), (-1143.9191508803, 132.2944760409))
            ThreePointArc((-1143.9191508803, 132.2944760409), (-1246.080217547, 36.7315486073), (-1143.9191508803, -58.8313788262))
            Line((-1143.9191508803, -58.8313788262), (-952.6928397692, -46.0545334777))
            ThreePointArc((-952.6928397692, -46.0545334777), (-988.8584096054, -40.3766727704), (-1019.0601869407, -19.6875647766))
            Line((-1019.0601869407, -19.6875647766), (-1145.9680042136, -28.1669499898))
            ThreePointArc((-1145.9680042136, -28.1669499898), (-1215.347417547, 36.7315486073), (-1145.9680042136, 101.6300472045))
            Line((-1145.9680042136, 101.6300472045), (-1019.0601869407, 93.1506619913))
        make_face()
    extrude(amount=F19_DEPTH)


solid = Compound([f1.part, f3.part, f5.part, f7.part, f9.part, f11.part, f13.part, f15.part, f17.part, f19.part])
